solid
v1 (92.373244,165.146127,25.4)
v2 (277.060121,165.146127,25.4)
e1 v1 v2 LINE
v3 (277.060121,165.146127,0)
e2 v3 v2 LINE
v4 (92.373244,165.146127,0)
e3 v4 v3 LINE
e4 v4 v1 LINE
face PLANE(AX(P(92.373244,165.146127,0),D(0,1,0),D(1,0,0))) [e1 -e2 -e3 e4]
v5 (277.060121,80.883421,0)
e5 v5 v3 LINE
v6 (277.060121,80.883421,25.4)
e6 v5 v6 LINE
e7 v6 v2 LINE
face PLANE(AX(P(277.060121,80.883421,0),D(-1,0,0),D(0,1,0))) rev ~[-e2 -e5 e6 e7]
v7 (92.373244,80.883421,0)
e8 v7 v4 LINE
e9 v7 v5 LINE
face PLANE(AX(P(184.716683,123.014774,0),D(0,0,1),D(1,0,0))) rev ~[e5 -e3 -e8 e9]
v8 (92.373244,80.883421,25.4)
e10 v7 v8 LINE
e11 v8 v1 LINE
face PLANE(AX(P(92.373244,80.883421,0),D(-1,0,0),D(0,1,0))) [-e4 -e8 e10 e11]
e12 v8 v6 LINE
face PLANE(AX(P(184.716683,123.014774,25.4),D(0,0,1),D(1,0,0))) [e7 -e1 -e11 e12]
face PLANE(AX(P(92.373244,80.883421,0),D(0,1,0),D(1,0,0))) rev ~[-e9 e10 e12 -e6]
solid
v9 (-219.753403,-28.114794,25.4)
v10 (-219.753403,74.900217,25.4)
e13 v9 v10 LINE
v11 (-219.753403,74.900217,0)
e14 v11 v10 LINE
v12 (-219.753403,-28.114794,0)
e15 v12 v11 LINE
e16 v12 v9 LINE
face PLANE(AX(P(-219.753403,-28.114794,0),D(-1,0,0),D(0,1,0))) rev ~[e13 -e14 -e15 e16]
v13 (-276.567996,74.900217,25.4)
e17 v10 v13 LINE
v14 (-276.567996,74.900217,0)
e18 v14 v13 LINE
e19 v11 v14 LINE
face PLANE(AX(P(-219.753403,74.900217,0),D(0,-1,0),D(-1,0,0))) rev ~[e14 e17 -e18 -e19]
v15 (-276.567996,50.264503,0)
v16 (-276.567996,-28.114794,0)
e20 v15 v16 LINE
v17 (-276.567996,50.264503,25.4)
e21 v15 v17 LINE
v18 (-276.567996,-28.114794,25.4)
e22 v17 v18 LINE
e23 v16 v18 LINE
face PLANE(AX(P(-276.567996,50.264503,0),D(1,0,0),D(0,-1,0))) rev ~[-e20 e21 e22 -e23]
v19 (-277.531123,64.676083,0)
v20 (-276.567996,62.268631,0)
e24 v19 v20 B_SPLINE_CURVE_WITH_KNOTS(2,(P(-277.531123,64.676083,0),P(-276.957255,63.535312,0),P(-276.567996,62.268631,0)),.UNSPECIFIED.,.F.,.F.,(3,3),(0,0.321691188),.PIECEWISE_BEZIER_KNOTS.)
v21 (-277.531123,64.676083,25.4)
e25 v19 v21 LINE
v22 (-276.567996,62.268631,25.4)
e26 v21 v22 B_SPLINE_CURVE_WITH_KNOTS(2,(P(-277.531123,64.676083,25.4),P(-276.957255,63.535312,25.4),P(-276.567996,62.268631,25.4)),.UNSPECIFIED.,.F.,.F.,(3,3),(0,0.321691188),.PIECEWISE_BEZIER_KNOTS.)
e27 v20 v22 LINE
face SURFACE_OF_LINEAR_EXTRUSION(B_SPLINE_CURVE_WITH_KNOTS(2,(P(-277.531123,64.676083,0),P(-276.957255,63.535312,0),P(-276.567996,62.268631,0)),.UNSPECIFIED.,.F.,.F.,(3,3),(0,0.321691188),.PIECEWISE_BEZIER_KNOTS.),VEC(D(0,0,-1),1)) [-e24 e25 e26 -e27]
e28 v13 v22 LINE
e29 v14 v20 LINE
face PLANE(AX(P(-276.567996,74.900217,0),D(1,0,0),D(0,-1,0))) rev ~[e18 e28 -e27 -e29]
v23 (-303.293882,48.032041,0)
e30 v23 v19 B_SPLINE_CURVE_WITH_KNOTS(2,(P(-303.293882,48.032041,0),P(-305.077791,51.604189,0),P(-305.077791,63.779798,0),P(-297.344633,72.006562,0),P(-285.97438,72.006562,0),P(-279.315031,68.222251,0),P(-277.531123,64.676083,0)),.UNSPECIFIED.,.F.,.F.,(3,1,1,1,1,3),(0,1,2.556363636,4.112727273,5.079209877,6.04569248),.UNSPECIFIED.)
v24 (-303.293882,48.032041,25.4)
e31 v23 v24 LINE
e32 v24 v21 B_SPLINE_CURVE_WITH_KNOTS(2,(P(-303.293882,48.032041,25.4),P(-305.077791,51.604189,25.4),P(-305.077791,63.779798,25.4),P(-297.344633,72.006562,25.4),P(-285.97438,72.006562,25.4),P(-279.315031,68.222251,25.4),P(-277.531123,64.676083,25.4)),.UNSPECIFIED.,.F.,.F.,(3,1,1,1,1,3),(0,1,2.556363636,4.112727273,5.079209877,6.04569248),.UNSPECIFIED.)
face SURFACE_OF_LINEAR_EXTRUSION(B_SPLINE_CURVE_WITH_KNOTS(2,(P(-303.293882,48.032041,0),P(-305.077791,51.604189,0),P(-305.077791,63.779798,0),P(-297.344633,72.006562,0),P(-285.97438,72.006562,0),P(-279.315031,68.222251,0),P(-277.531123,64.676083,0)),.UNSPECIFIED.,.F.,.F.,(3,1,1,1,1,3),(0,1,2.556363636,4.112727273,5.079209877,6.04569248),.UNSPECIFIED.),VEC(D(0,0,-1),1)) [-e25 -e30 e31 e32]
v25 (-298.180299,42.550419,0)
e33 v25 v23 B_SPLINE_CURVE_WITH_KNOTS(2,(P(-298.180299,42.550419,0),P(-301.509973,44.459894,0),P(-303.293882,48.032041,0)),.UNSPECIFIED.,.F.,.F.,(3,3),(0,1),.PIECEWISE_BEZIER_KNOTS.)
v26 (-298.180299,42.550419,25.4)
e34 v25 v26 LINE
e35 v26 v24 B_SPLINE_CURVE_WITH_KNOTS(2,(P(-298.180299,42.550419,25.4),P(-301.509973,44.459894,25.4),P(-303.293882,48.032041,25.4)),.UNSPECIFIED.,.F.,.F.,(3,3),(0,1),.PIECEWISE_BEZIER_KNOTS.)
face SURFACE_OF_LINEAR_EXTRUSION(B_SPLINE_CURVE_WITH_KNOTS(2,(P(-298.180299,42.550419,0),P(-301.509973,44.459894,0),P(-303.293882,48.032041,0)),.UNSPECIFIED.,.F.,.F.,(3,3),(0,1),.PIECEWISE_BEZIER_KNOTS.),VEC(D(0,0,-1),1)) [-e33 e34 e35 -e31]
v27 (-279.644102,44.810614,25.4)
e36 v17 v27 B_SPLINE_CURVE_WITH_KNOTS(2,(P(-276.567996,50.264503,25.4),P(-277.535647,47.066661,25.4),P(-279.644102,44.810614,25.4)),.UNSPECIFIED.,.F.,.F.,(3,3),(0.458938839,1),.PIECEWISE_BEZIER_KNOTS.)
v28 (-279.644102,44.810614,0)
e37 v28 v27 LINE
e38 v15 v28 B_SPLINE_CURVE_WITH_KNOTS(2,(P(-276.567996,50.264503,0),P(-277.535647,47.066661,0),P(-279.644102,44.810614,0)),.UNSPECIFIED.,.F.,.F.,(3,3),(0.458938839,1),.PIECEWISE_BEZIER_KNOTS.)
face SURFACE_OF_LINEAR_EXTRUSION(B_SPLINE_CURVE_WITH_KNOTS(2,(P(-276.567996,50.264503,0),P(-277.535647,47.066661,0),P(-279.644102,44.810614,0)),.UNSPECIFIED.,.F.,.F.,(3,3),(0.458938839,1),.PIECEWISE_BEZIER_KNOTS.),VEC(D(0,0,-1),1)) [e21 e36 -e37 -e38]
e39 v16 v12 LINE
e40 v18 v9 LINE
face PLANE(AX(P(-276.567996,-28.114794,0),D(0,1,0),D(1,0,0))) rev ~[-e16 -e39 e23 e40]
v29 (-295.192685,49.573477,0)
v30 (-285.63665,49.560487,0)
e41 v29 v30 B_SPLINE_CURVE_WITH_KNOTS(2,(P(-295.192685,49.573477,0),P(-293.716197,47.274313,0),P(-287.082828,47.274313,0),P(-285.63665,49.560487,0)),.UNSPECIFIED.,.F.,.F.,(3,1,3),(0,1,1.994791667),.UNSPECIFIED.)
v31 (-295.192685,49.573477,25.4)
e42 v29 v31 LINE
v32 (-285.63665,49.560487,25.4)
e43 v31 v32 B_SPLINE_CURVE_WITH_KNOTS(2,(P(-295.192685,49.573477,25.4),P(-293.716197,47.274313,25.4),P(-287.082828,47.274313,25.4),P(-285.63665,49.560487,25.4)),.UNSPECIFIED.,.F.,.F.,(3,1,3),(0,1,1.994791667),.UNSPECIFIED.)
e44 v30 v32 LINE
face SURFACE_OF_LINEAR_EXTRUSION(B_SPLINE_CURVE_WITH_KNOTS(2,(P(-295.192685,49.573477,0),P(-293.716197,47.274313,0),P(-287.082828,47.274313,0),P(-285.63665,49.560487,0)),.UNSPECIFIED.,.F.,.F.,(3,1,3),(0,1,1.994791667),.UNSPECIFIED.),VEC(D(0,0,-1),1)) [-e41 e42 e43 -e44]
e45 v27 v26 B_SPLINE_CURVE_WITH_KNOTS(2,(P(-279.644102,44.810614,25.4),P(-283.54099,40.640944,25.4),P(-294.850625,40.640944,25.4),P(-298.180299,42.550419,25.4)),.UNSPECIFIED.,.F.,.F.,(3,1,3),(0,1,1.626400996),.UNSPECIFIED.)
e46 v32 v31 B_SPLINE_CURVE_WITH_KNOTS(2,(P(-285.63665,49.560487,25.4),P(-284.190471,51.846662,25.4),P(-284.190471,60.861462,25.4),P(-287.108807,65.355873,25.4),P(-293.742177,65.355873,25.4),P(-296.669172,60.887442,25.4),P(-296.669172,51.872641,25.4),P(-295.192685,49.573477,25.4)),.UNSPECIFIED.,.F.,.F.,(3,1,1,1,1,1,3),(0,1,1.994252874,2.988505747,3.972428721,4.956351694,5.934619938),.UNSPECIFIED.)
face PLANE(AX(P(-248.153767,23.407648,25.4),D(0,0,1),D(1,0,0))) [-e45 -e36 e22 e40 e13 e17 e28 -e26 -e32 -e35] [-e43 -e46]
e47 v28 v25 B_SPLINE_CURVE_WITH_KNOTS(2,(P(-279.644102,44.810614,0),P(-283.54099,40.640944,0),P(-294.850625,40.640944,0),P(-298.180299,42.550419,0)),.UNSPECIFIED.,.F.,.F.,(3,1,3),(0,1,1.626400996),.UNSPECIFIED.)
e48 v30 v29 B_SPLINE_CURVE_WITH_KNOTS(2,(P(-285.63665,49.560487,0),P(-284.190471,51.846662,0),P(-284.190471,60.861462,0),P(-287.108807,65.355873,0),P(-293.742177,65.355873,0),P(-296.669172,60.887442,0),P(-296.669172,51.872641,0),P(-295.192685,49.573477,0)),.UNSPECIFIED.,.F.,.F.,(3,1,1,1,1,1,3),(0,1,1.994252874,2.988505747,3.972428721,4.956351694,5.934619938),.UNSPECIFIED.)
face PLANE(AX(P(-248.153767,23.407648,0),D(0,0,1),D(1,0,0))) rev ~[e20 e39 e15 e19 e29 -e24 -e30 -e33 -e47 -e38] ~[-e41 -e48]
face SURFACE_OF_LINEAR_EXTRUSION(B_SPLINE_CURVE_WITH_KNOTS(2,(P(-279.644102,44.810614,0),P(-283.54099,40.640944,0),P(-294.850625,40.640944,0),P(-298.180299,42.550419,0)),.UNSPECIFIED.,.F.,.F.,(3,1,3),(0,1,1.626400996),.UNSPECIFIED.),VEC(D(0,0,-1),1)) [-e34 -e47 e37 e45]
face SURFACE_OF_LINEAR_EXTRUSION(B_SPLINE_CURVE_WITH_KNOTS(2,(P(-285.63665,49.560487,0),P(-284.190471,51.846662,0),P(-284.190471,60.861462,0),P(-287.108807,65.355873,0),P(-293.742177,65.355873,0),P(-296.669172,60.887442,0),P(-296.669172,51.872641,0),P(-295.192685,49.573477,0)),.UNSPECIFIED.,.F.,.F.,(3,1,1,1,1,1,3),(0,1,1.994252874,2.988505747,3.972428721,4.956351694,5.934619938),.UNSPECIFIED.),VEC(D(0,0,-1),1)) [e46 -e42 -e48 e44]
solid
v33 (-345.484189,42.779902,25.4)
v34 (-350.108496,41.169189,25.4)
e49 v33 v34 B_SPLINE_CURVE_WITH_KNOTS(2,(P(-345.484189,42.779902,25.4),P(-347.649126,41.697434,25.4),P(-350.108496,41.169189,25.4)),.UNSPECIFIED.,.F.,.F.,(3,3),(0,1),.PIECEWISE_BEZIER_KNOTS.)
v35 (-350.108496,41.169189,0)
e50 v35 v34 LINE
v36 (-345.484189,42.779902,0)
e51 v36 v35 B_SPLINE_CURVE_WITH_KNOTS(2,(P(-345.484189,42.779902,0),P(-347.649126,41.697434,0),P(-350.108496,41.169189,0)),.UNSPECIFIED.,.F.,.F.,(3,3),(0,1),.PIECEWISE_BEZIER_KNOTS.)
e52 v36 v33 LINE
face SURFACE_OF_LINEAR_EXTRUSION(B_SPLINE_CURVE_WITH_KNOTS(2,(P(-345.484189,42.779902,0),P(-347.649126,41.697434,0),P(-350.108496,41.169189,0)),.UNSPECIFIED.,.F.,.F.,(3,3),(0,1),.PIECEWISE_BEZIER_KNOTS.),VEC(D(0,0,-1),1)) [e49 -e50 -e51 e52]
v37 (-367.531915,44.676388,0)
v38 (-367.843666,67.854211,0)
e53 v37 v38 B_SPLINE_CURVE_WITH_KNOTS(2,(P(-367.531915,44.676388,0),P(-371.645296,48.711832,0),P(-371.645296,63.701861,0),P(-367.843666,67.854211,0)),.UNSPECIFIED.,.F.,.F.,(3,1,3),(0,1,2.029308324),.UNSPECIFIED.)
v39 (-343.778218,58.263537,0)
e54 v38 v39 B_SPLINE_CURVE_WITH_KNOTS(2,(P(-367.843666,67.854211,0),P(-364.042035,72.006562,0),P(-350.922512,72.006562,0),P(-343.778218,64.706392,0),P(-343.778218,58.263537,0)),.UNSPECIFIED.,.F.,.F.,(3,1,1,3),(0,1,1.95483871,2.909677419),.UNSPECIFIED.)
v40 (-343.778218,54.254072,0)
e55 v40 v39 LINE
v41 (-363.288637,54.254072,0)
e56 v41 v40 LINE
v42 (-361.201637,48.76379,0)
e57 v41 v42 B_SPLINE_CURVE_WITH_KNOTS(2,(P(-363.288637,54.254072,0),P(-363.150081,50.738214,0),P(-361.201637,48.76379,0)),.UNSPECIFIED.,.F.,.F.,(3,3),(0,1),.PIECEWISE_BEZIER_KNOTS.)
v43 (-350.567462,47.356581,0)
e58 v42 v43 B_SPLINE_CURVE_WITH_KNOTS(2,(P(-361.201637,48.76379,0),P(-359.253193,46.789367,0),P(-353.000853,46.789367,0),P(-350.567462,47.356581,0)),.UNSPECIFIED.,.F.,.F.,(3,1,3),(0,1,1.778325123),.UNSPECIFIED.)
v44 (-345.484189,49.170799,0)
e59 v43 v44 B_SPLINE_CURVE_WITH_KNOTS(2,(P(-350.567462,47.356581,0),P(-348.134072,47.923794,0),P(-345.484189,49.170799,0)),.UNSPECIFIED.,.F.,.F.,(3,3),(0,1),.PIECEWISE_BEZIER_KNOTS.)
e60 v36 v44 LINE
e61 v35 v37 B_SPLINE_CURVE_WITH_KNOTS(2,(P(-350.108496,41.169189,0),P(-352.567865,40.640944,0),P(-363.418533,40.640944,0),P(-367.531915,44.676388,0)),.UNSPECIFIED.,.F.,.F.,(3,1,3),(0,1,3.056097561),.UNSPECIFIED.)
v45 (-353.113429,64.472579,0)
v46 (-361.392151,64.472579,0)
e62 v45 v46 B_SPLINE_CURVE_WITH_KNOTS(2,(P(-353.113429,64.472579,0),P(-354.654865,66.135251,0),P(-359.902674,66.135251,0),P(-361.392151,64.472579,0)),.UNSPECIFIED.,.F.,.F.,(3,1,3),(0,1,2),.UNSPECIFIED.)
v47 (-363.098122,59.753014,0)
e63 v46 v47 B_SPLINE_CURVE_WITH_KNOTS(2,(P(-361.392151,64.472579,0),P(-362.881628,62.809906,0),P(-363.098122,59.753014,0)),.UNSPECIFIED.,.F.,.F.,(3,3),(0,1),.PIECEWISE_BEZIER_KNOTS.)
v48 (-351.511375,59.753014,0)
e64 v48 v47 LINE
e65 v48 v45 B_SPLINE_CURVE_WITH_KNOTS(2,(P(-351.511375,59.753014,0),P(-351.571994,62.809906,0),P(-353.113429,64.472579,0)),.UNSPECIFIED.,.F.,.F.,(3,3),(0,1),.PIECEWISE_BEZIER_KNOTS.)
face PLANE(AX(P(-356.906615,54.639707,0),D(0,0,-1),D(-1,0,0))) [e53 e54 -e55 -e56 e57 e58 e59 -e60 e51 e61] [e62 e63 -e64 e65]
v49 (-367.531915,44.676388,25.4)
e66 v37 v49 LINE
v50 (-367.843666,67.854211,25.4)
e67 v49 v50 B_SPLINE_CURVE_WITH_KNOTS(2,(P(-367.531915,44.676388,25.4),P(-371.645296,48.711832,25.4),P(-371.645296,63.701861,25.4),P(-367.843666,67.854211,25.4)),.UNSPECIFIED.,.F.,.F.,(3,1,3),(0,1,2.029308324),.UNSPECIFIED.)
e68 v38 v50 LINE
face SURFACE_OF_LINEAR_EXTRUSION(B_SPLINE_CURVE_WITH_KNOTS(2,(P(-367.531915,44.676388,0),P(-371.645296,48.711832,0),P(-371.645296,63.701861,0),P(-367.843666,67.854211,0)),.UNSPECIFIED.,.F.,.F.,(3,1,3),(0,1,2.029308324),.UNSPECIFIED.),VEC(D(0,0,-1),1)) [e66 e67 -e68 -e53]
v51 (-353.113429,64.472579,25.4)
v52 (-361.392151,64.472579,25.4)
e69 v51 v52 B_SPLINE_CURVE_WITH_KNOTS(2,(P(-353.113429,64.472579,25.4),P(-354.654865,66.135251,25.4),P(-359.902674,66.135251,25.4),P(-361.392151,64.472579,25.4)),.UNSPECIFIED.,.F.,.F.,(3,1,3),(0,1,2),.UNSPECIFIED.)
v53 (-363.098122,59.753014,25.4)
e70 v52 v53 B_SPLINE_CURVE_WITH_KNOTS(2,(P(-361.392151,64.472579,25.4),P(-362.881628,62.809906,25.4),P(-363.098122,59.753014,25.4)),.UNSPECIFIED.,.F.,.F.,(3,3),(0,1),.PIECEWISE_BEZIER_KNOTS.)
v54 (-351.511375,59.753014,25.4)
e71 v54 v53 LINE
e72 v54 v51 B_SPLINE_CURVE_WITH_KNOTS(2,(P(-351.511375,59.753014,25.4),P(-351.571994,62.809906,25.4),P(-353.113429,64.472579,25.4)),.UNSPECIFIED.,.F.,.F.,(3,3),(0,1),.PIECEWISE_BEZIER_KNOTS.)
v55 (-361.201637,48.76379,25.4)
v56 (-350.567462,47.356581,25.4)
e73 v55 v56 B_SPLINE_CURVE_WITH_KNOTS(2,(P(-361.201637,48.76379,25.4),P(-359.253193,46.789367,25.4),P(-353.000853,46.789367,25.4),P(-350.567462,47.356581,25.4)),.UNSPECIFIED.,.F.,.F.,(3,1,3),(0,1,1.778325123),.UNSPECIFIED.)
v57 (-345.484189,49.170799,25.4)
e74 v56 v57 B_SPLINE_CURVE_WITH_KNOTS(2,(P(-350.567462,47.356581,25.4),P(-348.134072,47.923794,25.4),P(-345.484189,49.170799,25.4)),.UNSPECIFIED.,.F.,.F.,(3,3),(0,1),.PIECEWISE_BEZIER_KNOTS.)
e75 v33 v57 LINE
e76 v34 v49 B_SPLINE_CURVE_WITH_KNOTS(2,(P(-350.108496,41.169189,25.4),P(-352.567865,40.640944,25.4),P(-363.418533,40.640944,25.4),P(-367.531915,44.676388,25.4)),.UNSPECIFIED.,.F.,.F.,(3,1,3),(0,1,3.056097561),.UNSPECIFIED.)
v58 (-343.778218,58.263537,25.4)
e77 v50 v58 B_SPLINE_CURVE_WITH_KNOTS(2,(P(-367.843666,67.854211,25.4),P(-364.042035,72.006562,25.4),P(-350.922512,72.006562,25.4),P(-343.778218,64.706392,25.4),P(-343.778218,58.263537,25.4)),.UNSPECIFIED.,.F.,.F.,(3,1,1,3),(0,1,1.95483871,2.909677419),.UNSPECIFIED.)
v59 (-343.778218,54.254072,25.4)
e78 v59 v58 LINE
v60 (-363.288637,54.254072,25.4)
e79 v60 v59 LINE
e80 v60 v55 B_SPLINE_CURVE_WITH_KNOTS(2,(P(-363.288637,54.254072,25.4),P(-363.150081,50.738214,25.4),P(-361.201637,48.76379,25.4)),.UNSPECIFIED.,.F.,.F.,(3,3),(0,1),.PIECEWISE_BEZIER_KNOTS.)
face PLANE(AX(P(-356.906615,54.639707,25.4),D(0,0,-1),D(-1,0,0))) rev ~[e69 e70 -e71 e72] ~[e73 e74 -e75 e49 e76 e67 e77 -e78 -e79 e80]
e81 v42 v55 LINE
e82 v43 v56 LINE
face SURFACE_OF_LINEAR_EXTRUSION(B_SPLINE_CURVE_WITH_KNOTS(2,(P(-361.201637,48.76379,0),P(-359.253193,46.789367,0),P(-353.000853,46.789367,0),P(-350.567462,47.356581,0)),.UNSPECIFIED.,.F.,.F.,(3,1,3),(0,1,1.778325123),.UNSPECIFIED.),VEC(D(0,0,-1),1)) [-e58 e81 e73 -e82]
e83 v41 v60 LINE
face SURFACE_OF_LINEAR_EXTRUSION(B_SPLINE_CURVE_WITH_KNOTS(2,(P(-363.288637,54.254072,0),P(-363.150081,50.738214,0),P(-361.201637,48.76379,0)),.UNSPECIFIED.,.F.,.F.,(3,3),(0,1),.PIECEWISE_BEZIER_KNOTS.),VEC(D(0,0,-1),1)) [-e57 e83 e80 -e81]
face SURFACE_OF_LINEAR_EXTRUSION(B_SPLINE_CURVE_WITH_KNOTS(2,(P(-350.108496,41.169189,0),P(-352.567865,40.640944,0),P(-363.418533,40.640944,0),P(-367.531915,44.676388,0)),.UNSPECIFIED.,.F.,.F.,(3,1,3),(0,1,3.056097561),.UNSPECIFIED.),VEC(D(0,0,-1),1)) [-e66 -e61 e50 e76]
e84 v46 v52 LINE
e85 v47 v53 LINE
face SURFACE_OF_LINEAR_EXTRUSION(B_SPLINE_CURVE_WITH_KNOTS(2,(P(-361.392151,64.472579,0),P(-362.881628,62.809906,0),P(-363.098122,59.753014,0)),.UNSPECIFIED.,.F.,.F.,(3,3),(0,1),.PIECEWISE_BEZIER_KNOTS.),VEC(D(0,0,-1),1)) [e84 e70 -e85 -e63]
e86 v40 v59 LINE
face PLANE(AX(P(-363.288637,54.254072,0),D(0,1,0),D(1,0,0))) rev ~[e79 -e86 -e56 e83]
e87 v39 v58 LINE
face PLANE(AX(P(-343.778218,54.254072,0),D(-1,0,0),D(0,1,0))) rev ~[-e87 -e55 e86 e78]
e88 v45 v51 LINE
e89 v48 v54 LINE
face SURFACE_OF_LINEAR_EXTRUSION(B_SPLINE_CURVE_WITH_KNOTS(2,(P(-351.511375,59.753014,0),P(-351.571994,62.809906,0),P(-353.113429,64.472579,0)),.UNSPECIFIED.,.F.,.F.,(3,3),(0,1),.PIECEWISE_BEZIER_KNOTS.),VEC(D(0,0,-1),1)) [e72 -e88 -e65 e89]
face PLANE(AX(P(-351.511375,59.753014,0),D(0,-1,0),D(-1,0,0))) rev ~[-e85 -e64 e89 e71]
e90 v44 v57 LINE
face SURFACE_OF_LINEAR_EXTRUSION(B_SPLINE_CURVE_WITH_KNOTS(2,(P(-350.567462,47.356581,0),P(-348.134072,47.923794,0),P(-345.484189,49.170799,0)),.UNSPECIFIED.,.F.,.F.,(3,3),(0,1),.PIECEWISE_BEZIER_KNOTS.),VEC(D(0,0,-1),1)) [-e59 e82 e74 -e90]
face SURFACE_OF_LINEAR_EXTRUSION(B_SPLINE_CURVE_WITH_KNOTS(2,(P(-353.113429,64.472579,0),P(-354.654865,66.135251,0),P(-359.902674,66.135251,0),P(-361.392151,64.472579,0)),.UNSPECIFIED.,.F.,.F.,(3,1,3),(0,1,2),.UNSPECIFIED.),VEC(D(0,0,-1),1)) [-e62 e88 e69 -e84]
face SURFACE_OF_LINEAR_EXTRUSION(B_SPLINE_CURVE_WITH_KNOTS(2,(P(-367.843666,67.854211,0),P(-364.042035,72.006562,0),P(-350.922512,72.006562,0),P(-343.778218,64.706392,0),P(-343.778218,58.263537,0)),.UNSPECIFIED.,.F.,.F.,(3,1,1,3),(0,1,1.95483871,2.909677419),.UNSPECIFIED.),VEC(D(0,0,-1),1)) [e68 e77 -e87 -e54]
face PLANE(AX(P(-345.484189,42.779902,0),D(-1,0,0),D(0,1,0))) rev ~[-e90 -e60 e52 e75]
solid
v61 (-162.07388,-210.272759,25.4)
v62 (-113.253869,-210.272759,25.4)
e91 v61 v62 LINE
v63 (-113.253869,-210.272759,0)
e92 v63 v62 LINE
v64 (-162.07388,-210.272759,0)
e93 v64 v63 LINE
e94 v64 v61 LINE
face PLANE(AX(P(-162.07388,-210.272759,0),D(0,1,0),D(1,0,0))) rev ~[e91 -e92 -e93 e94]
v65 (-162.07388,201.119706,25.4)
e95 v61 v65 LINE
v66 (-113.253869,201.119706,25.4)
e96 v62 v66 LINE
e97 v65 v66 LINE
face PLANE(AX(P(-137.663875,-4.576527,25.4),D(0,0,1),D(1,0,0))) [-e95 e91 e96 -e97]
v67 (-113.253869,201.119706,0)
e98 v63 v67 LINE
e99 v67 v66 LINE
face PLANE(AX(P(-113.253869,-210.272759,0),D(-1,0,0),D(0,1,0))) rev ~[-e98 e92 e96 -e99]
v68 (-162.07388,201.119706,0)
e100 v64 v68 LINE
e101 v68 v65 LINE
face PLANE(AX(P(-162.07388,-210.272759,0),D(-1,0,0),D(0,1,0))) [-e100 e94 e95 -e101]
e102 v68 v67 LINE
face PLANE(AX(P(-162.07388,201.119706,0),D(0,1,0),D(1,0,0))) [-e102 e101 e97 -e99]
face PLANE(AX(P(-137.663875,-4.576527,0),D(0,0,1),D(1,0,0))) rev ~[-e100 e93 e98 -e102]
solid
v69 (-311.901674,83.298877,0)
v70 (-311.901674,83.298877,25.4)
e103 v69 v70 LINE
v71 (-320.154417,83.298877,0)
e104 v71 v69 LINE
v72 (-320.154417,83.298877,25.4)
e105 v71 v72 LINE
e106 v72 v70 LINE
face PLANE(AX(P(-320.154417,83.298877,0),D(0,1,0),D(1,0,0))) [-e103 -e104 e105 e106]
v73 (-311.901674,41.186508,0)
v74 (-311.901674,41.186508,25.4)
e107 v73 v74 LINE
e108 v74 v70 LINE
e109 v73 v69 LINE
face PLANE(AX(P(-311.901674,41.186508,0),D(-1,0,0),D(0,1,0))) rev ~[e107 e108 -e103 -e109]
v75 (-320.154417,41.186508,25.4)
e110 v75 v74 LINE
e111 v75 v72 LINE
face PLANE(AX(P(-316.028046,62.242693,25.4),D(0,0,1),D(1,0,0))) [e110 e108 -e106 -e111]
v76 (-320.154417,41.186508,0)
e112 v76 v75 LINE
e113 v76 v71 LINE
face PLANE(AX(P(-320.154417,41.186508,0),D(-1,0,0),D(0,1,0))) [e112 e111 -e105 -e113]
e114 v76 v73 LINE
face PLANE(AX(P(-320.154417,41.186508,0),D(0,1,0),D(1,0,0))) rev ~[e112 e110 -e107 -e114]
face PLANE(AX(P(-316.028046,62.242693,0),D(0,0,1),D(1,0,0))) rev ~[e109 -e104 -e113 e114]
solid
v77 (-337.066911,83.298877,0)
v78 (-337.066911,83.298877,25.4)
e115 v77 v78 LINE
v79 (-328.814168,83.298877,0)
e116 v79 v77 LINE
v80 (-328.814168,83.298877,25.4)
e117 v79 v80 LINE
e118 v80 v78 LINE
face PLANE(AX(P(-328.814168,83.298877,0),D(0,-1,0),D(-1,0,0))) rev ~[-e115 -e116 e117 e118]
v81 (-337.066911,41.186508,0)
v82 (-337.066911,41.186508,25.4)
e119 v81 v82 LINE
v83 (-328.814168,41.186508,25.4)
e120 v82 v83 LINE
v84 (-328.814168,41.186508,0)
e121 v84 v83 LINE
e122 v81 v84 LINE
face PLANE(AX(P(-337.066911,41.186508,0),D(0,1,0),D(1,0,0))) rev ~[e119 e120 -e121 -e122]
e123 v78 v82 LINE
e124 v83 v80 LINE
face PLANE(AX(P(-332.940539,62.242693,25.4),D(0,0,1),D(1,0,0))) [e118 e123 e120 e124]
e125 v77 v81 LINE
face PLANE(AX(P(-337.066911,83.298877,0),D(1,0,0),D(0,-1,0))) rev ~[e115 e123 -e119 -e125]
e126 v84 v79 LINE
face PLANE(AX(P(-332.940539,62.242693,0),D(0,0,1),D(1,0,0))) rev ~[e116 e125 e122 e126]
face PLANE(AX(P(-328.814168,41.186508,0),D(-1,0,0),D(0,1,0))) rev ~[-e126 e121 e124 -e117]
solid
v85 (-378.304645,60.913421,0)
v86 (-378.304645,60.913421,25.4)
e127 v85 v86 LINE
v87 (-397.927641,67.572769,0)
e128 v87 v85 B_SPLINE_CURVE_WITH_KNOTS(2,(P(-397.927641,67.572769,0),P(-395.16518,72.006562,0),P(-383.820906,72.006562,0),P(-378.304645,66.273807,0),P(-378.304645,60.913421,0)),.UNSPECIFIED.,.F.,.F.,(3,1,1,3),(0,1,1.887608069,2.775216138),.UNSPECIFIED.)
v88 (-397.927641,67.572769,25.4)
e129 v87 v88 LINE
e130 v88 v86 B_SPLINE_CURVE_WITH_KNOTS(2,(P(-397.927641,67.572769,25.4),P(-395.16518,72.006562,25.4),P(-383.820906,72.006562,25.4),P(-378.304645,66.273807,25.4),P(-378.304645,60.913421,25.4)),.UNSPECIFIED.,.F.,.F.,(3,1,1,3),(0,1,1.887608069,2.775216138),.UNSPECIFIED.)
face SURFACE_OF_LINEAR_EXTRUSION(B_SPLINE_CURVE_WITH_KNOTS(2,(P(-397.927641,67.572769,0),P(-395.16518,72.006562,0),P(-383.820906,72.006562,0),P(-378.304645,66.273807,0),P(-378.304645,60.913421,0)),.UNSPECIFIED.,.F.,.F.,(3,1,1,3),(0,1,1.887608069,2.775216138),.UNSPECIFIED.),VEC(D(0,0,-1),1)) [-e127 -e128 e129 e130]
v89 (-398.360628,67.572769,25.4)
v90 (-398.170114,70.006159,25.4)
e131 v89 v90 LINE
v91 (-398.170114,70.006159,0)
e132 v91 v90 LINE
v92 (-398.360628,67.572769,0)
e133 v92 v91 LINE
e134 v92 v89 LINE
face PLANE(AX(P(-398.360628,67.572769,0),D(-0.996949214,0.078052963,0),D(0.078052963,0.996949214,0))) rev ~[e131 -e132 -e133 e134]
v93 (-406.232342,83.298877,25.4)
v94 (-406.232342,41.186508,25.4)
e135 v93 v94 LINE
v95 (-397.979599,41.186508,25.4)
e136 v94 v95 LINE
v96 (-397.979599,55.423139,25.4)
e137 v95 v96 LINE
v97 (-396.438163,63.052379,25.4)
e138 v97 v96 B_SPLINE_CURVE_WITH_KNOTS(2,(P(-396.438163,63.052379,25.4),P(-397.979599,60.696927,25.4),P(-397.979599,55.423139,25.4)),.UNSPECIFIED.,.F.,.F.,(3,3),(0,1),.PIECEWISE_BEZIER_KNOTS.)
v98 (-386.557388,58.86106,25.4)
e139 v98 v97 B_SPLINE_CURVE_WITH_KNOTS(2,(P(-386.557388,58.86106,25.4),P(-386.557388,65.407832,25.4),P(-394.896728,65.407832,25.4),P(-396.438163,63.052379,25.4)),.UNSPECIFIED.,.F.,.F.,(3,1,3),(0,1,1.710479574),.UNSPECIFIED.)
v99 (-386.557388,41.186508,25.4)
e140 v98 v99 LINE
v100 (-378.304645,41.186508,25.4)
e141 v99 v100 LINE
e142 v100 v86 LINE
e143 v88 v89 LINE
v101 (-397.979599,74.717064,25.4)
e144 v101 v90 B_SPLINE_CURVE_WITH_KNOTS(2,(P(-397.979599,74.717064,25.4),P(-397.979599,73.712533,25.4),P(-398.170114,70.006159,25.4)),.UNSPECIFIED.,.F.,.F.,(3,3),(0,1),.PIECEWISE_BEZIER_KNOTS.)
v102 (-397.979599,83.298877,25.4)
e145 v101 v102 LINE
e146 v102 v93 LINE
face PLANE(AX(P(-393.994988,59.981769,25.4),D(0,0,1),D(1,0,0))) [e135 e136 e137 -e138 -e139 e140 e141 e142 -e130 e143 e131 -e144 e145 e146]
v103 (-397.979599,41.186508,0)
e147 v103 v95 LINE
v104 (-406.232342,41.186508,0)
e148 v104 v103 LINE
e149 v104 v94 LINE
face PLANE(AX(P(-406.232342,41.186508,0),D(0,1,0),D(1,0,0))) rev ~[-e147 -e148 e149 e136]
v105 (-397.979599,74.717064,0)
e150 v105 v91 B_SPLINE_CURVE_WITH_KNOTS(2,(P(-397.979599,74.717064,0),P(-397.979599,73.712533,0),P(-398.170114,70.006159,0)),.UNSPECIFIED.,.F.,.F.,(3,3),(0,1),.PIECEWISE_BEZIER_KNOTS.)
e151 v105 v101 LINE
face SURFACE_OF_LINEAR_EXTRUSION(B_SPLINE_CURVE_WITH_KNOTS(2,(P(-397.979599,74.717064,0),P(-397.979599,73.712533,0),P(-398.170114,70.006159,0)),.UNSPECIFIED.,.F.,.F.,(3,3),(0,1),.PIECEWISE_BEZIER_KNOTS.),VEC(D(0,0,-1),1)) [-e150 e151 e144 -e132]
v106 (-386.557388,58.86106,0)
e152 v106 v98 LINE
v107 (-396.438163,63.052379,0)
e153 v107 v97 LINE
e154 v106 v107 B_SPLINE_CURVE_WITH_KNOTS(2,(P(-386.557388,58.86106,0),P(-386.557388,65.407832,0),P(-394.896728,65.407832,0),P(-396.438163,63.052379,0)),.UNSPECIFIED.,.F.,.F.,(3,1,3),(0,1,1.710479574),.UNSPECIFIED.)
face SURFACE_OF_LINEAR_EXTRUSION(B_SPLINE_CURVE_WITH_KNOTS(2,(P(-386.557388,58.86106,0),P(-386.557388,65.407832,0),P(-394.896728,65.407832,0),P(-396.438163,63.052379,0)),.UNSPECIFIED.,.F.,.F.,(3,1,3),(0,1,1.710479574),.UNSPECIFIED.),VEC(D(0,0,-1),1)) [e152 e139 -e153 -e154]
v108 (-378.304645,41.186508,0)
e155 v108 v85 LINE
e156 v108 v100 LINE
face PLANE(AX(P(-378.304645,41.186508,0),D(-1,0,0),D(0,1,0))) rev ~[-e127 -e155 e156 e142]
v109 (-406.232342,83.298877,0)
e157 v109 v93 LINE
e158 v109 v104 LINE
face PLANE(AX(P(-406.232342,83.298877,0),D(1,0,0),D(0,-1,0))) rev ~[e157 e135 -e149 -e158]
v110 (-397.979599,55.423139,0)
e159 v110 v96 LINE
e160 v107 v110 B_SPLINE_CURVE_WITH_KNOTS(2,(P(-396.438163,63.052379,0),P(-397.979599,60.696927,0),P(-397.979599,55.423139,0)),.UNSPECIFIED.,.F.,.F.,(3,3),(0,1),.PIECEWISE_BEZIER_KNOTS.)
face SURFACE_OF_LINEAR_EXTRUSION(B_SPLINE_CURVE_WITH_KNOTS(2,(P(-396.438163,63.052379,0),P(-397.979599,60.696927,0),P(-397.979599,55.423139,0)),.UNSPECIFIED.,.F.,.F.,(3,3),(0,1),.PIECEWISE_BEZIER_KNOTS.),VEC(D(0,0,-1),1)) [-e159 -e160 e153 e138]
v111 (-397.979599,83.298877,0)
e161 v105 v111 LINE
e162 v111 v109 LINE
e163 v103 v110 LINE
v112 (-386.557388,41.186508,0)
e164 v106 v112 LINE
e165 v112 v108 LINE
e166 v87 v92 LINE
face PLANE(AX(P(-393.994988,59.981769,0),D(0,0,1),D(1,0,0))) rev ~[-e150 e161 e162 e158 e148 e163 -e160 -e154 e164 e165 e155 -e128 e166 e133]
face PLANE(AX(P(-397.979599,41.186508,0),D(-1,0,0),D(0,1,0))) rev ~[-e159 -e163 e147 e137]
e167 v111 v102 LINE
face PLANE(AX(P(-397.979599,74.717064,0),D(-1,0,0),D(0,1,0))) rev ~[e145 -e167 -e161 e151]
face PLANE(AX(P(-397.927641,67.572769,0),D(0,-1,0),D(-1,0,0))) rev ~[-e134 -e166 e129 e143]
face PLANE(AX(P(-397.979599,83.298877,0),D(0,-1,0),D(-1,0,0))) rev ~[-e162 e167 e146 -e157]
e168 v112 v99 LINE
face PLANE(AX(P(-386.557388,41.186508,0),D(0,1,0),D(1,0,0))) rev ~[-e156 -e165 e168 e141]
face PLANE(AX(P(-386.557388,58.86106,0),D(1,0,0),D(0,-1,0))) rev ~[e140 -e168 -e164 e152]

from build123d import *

# Parameters (mm, degrees)
F0_W     = 184.6868768334
F0_H     = 84.2627063394
F0_W_2   = 48.8200113177
F0_H_2   = 411.3924652338
F0_W_3   = 8.2527426776
F0_H_3   = 42.1123689836
F1_DEPTH = 25.4


with BuildPart() as f1:
    # F0 (on Top) → F1 (new body)
    with BuildSketch(Plane.XY):
        with Locations((184.7166828811, 123.0147741735)):
            Rectangle(F0_W, F0_H)
        with Locations((-137.6638747752, -4.5765265822)):
            Rectangle(F0_W_2, F0_H_2)
        with BuildLine():
            Line((-386.5573875373, 41.1865082052), (-378.3046448597, 41.1865082052))
            Line((-378.3046448597, 41.1865082052), (-378.3046448597, 60.9134209226))
            add(Edge.make_bspline(
                [(-381.0627755447, 69.1401843473), (-378.3046448597, 66.2738067751), (-378.3046448597, 60.9134209226)],
                knots=[0, 0, 0, 1, 1, 1], degree=2))
            add(Edge.make_bspline(
                [(-389.1553128293, 72.0065619195), (-383.8209062297, 72.0065619195), (-381.0627755447, 69.1401843473)],
                knots=[0, 0, 0, 1, 1, 1], degree=2))
            add(Edge.make_bspline(
                [(-397.9276405654, 67.5727694211), (-395.1651800049, 72.0065619195), (-389.1553128293, 72.0065619195)],
                knots=[0, 0, 0, 1, 1, 1], degree=2))
            Line((-397.9276405654, 67.5727694211), (-398.3606281141, 67.5727694211))
            Line((-398.3606281141, 67.5727694211), (-398.1701135926, 70.0061594447))
            add(Edge.make_bspline(
                [(-397.9795990712, 74.7170639742), (-397.9795990712, 73.7125328613), (-398.1701135926, 70.0061594447)],
                knots=[0, 0, 0, 1, 1, 1], degree=2))
            Line((-397.9795990712, 74.7170639742), (-397.9795990712, 83.2988771888))
            Line((-397.9795990712, 83.2988771888), (-406.2323417489, 83.2988771888))
            Line((-406.2323417489, 83.2988771888), (-406.2323417489, 41.1865082052))
            Line((-406.2323417489, 41.1865082052), (-397.9795990712, 41.1865082052))
            Line((-397.9795990712, 41.1865082052), (-397.9795990712, 55.4231388055))
            add(Edge.make_bspline(
                [(-396.438163398, 63.052379413), (-397.9795990712, 60.6969271483), (-397.9795990712, 55.4231388055)],
                knots=[0, 0, 0, 1, 1, 1], degree=2))
            add(Edge.make_bspline(
                [(-391.4328273353, 65.4078316778), (-394.8967277247, 65.4078316778), (-396.438163398, 63.052379413)],
                knots=[0, 0, 0, 1, 1, 1], degree=2))
            add(Edge.make_bspline(
                [(-386.5573875373, 58.8610599419), (-386.5573875373, 65.4078316778), (-391.4328273353, 65.4078316778)],
                knots=[0, 0, 0, 1, 1, 1], degree=2))
            Line((-386.5573875373, 58.8610599419), (-386.5573875373, 41.1865082052))
        make_face()
        Polygon((-336.9529306078, 41.1865082052), (-328.8141680467, 41.1865082052), (-328.8141680467, 83.2988771888), (-337.0669107244, 83.2988771888), (-337.0669107244, 41.1865082052), align=None)
        with Locations((-316.0280457345, 62.242692697)):
            Rectangle(F0_W_3, F0_H_3)
        with BuildLine():
            Line((-276.5679955482, 50.2645032945), (-276.5679955482, -28.1147938222))
            Line((-276.5679955482, -28.1147938222), (-219.7534025482, -28.1147938222))
            Line((-219.7534025482, -28.1147938222), (-219.7534025482, 74.9002173543))
            Line((-219.7534025482, 74.9002173543), (-276.5679955482, 74.9002173543))
            Line((-276.5679955482, 74.9002173543), (-276.5679955482, 62.2686307575))
            add(Edge.make_bspline(
                [(-276.5679955482, 62.2686307575), (-275.7472140818, 59.5977436271), (-275.7472140818, 56.3670516616)],
                knots=[0.3216911884, 0.3216911884, 0.3216911884, 1, 1, 1], degree=2))
            add(Edge.make_bspline(
                [(-275.7472140818, 56.3670516616), (-275.7472140818, 52.9769771283), (-276.5679955482, 50.2645032945)],
                knots=[0, 0, 0, 0.4589388385, 0.4589388385, 0.4589388385], degree=2))
        make_face()
        with BuildLine():
            add(Edge.make_bspline(
                [(-356.1183628659, 40.6409438939), (-363.4185329364, 40.6409438939), (-367.5319146488, 44.6763878475)],
                knots=[0, 0, 0, 1, 1, 1], degree=2))
            add(Edge.make_bspline(
                [(-350.1084956903, 41.1691887033), (-352.5678649668, 40.6409438939), (-356.1183628659, 40.6409438939)],
                knots=[0, 0, 0, 1, 1, 1], degree=2))
            add(Edge.make_bspline(
                [(-345.4841886705, 42.7799023843), (-347.6491264139, 41.6974335126), (-350.1084956903, 41.1691887033)],
                knots=[0, 0, 0, 1, 1, 1], degree=2))
            Line((-345.4841886705, 42.7799023843), (-345.4841886705, 49.1707986027))
            add(Edge.make_bspline(
                [(-350.5674624919, 47.3565807737), (-348.1340724684, 47.9237944625), (-345.4841886705, 49.1707986027)],
                knots=[0, 0, 0, 1, 1, 1], degree=2))
            add(Edge.make_bspline(
                [(-355.737333823, 46.789367085), (-353.0008525154, 46.789367085), (-350.5674624919, 47.3565807737)],
                knots=[0, 0, 0, 1, 1, 1], degree=2))
            add(Edge.make_bspline(
                [(-361.2016366872, 48.7637903069), (-359.2531927182, 46.789367085), (-355.737333823, 46.789367085)],
                knots=[0, 0, 0, 1, 1, 1], degree=2))
            add(Edge.make_bspline(
                [(-363.2886366718, 54.2540724241), (-363.1500806562, 50.7382135289), (-361.2016366872, 48.7637903069)],
                knots=[0, 0, 0, 1, 1, 1], degree=2))
            Line((-363.2886366718, 54.2540724241), (-343.7782177288, 54.2540724241))
            Line((-343.7782177288, 54.2540724241), (-343.7782177288, 58.2635371247))
            add(Edge.make_bspline(
                [(-347.3503650053, 68.3564768842), (-343.7782177288, 64.7063918489), (-343.7782177288, 58.2635371247)],
                knots=[0, 0, 0, 1, 1, 1], degree=2))
            add(Edge.make_bspline(
                [(-357.3307280021, 72.0065619195), (-350.9225122818, 72.0065619195), (-347.3503650053, 68.3564768842)],
                knots=[0, 0, 0, 1, 1, 1], degree=2))
            add(Edge.make_bspline(
                [(-367.8436656838, 67.8542113278), (-364.0420350065, 72.0065619195), (-357.3307280021, 72.0065619195)],
                knots=[0, 0, 0, 1, 1, 1], degree=2))
            add(Edge.make_bspline(
                [(-371.6452963611, 56.0985993814), (-371.6452963611, 63.701860736), (-367.8436656838, 67.8542113278)],
                knots=[0, 0, 0, 1, 1, 1], degree=2))
            add(Edge.make_bspline(
                [(-367.5319146488, 44.6763878475), (-371.6452963611, 48.7118318011), (-371.6452963611, 56.0985993814)],
                knots=[0, 0, 0, 1, 1, 1], degree=2))
        make_face()
        with BuildLine():
            add(Edge.make_bspline(
                [(-357.2787694963, 66.1352507595), (-359.9026740412, 66.1352507595), (-361.3921512086, 64.4725785727)],
                knots=[0, 0, 0, 1, 1, 1], degree=2))
            add(Edge.make_bspline(
                [(-353.1134292781, 64.4725785727), (-354.6548649513, 66.1352507595), (-357.2787694963, 66.1352507595)],
                knots=[0, 0, 0, 1, 1, 1], degree=2))
            add(Edge.make_bspline(
                [(-351.511375348, 59.7530142922), (-351.5719936048, 62.8099063858), (-353.1134292781, 64.4725785727)],
                knots=[0, 0, 0, 1, 1, 1], degree=2))
            Line((-351.511375348, 59.7530142922), (-363.0981221504, 59.7530142922))
            add(Edge.make_bspline(
                [(-361.3921512086, 64.4725785727), (-362.8816283761, 62.8099063858), (-363.0981221504, 59.7530142922)],
                knots=[0, 0, 0, 1, 1, 1], degree=2))
        make_face(mode=Mode.SUBTRACT)
        with BuildLine():
            add(Edge.make_bspline(
                [(-276.5679955482, 50.2645032945), (-277.5356473057, 47.0666605317), (-279.6441020198, 44.8106139876)],
                knots=[0.4589388385, 0.4589388385, 0.4589388385, 1, 1, 1], degree=2))
            Line((-276.5679955482, 50.2645032945), (-276.5679955482, 62.2686307575))
            add(Edge.make_bspline(
                [(-277.5311227823, 64.6760827205), (-276.9572550725, 63.5353117149), (-276.5679955482, 62.2686307575)],
                knots=[0, 0, 0, 0.3216911884, 0.3216911884, 0.3216911884], degree=2))
            add(Edge.make_bspline(
                [(-282.6447057321, 70.1144063318), (-279.3150314828, 68.2222507441), (-277.5311227823, 64.6760827205)],
                knots=[0, 0, 0, 1, 1, 1], degree=2))
            add(Edge.make_bspline(
                [(-290.330234721, 72.0065619195), (-285.9743799814, 72.0065619195), (-282.6447057321, 70.1144063318)],
                knots=[0, 0, 0, 1, 1, 1], degree=2))
            add(Edge.make_bspline(
                [(-301.2112118191, 67.8931802071), (-297.3446330094, 72.0065619195), (-290.330234721, 72.0065619195)],
                knots=[0, 0, 0, 1, 1, 1], degree=2))
            add(Edge.make_bspline(
                [(-305.0777906287, 56.3670516616), (-305.0777906287, 63.7797984948), (-301.2112118191, 67.8931802071)],
                knots=[0, 0, 0, 1, 1, 1], degree=2))
            add(Edge.make_bspline(
                [(-303.2938819282, 48.0320413497), (-305.0777906287, 51.6041886262), (-305.0777906287, 56.3670516616)],
                knots=[0, 0, 0, 1, 1, 1], degree=2))
            add(Edge.make_bspline(
                [(-298.1802989784, 42.5504189835), (-301.5099732276, 44.4598940731), (-303.2938819282, 48.0320413497)],
                knots=[0, 0, 0, 1, 1, 1], degree=2))
            add(Edge.make_bspline(
                [(-290.4947699895, 40.6409438939), (-294.8506247291, 40.6409438939), (-298.1802989784, 42.5504189835)],
                knots=[0, 0, 0, 1, 1, 1], degree=2))
            add(Edge.make_bspline(
                [(-279.6441020198, 44.8106139876), (-283.5409899579, 40.6409438939), (-290.4947699895, 40.6409438939)],
                knots=[0, 0, 0, 1, 1, 1], degree=2))
        make_face()
        with BuildLine():
            add(Edge.make_bspline(
                [(-296.6691724335, 56.3670516616), (-296.6691724335, 51.8726409064), (-295.1926848926, 49.5734770229)],
                knots=[0, 0, 0, 1, 1, 1], degree=2))
            add(Edge.make_bspline(
                [(-295.205674519, 63.1216574208), (-296.6691724335, 60.8874416697), (-296.6691724335, 56.3670516616)],
                knots=[0, 0, 0, 1, 1, 1], degree=2))
            add(Edge.make_bspline(
                [(-290.4428114836, 65.3558731719), (-293.7421766045, 65.3558731719), (-295.205674519, 63.1216574208)],
                knots=[0, 0, 0, 1, 1, 1], degree=2))
            add(Edge.make_bspline(
                [(-285.6496393199, 63.1086677943), (-287.1088073589, 65.3558731719), (-290.4428114836, 65.3558731719)],
                knots=[0, 0, 0, 1, 1, 1], degree=2))
            add(Edge.make_bspline(
                [(-284.1904712809, 56.3670516616), (-284.1904712809, 60.8614624167), (-285.6496393199, 63.1086677943)],
                knots=[0, 0, 0, 1, 1, 1], degree=2))
            add(Edge.make_bspline(
                [(-285.6366496934, 49.5604873965), (-284.1904712809, 51.8466616534), (-284.1904712809, 56.3670516616)],
                knots=[0, 0, 0, 1, 1, 1], degree=2))
            add(Edge.make_bspline(
                [(-290.3908529778, 47.2743131395), (-287.082828106, 47.2743131395), (-285.6366496934, 49.5604873965)],
                knots=[0, 0, 0, 1, 1, 1], degree=2))
            add(Edge.make_bspline(
                [(-295.1926848926, 49.5734770229), (-293.7161973516, 47.2743131395), (-290.3908529778, 47.2743131395)],
                knots=[0, 0, 0, 1, 1, 1], degree=2))
        make_face(mode=Mode.SUBTRACT)
        with BuildLine():
            Line((-276.5679955482, 62.2686307575), (-276.5679955482, 50.2645032945))
            add(Edge.make_bspline(
                [(-275.7472140818, 56.3670516616), (-275.7472140818, 52.9769771283), (-276.5679955482, 50.2645032945)],
                knots=[0, 0, 0, 0.4589388385, 0.4589388385, 0.4589388385], degree=2))
            add(Edge.make_bspline(
                [(-276.5679955482, 62.2686307575), (-275.7472140818, 59.5977436271), (-275.7472140818, 56.3670516616)],
                knots=[0.3216911884, 0.3216911884, 0.3216911884, 1, 1, 1], degree=2))
        make_face()
    extrude(amount=F1_DEPTH)


solid = f1.part
